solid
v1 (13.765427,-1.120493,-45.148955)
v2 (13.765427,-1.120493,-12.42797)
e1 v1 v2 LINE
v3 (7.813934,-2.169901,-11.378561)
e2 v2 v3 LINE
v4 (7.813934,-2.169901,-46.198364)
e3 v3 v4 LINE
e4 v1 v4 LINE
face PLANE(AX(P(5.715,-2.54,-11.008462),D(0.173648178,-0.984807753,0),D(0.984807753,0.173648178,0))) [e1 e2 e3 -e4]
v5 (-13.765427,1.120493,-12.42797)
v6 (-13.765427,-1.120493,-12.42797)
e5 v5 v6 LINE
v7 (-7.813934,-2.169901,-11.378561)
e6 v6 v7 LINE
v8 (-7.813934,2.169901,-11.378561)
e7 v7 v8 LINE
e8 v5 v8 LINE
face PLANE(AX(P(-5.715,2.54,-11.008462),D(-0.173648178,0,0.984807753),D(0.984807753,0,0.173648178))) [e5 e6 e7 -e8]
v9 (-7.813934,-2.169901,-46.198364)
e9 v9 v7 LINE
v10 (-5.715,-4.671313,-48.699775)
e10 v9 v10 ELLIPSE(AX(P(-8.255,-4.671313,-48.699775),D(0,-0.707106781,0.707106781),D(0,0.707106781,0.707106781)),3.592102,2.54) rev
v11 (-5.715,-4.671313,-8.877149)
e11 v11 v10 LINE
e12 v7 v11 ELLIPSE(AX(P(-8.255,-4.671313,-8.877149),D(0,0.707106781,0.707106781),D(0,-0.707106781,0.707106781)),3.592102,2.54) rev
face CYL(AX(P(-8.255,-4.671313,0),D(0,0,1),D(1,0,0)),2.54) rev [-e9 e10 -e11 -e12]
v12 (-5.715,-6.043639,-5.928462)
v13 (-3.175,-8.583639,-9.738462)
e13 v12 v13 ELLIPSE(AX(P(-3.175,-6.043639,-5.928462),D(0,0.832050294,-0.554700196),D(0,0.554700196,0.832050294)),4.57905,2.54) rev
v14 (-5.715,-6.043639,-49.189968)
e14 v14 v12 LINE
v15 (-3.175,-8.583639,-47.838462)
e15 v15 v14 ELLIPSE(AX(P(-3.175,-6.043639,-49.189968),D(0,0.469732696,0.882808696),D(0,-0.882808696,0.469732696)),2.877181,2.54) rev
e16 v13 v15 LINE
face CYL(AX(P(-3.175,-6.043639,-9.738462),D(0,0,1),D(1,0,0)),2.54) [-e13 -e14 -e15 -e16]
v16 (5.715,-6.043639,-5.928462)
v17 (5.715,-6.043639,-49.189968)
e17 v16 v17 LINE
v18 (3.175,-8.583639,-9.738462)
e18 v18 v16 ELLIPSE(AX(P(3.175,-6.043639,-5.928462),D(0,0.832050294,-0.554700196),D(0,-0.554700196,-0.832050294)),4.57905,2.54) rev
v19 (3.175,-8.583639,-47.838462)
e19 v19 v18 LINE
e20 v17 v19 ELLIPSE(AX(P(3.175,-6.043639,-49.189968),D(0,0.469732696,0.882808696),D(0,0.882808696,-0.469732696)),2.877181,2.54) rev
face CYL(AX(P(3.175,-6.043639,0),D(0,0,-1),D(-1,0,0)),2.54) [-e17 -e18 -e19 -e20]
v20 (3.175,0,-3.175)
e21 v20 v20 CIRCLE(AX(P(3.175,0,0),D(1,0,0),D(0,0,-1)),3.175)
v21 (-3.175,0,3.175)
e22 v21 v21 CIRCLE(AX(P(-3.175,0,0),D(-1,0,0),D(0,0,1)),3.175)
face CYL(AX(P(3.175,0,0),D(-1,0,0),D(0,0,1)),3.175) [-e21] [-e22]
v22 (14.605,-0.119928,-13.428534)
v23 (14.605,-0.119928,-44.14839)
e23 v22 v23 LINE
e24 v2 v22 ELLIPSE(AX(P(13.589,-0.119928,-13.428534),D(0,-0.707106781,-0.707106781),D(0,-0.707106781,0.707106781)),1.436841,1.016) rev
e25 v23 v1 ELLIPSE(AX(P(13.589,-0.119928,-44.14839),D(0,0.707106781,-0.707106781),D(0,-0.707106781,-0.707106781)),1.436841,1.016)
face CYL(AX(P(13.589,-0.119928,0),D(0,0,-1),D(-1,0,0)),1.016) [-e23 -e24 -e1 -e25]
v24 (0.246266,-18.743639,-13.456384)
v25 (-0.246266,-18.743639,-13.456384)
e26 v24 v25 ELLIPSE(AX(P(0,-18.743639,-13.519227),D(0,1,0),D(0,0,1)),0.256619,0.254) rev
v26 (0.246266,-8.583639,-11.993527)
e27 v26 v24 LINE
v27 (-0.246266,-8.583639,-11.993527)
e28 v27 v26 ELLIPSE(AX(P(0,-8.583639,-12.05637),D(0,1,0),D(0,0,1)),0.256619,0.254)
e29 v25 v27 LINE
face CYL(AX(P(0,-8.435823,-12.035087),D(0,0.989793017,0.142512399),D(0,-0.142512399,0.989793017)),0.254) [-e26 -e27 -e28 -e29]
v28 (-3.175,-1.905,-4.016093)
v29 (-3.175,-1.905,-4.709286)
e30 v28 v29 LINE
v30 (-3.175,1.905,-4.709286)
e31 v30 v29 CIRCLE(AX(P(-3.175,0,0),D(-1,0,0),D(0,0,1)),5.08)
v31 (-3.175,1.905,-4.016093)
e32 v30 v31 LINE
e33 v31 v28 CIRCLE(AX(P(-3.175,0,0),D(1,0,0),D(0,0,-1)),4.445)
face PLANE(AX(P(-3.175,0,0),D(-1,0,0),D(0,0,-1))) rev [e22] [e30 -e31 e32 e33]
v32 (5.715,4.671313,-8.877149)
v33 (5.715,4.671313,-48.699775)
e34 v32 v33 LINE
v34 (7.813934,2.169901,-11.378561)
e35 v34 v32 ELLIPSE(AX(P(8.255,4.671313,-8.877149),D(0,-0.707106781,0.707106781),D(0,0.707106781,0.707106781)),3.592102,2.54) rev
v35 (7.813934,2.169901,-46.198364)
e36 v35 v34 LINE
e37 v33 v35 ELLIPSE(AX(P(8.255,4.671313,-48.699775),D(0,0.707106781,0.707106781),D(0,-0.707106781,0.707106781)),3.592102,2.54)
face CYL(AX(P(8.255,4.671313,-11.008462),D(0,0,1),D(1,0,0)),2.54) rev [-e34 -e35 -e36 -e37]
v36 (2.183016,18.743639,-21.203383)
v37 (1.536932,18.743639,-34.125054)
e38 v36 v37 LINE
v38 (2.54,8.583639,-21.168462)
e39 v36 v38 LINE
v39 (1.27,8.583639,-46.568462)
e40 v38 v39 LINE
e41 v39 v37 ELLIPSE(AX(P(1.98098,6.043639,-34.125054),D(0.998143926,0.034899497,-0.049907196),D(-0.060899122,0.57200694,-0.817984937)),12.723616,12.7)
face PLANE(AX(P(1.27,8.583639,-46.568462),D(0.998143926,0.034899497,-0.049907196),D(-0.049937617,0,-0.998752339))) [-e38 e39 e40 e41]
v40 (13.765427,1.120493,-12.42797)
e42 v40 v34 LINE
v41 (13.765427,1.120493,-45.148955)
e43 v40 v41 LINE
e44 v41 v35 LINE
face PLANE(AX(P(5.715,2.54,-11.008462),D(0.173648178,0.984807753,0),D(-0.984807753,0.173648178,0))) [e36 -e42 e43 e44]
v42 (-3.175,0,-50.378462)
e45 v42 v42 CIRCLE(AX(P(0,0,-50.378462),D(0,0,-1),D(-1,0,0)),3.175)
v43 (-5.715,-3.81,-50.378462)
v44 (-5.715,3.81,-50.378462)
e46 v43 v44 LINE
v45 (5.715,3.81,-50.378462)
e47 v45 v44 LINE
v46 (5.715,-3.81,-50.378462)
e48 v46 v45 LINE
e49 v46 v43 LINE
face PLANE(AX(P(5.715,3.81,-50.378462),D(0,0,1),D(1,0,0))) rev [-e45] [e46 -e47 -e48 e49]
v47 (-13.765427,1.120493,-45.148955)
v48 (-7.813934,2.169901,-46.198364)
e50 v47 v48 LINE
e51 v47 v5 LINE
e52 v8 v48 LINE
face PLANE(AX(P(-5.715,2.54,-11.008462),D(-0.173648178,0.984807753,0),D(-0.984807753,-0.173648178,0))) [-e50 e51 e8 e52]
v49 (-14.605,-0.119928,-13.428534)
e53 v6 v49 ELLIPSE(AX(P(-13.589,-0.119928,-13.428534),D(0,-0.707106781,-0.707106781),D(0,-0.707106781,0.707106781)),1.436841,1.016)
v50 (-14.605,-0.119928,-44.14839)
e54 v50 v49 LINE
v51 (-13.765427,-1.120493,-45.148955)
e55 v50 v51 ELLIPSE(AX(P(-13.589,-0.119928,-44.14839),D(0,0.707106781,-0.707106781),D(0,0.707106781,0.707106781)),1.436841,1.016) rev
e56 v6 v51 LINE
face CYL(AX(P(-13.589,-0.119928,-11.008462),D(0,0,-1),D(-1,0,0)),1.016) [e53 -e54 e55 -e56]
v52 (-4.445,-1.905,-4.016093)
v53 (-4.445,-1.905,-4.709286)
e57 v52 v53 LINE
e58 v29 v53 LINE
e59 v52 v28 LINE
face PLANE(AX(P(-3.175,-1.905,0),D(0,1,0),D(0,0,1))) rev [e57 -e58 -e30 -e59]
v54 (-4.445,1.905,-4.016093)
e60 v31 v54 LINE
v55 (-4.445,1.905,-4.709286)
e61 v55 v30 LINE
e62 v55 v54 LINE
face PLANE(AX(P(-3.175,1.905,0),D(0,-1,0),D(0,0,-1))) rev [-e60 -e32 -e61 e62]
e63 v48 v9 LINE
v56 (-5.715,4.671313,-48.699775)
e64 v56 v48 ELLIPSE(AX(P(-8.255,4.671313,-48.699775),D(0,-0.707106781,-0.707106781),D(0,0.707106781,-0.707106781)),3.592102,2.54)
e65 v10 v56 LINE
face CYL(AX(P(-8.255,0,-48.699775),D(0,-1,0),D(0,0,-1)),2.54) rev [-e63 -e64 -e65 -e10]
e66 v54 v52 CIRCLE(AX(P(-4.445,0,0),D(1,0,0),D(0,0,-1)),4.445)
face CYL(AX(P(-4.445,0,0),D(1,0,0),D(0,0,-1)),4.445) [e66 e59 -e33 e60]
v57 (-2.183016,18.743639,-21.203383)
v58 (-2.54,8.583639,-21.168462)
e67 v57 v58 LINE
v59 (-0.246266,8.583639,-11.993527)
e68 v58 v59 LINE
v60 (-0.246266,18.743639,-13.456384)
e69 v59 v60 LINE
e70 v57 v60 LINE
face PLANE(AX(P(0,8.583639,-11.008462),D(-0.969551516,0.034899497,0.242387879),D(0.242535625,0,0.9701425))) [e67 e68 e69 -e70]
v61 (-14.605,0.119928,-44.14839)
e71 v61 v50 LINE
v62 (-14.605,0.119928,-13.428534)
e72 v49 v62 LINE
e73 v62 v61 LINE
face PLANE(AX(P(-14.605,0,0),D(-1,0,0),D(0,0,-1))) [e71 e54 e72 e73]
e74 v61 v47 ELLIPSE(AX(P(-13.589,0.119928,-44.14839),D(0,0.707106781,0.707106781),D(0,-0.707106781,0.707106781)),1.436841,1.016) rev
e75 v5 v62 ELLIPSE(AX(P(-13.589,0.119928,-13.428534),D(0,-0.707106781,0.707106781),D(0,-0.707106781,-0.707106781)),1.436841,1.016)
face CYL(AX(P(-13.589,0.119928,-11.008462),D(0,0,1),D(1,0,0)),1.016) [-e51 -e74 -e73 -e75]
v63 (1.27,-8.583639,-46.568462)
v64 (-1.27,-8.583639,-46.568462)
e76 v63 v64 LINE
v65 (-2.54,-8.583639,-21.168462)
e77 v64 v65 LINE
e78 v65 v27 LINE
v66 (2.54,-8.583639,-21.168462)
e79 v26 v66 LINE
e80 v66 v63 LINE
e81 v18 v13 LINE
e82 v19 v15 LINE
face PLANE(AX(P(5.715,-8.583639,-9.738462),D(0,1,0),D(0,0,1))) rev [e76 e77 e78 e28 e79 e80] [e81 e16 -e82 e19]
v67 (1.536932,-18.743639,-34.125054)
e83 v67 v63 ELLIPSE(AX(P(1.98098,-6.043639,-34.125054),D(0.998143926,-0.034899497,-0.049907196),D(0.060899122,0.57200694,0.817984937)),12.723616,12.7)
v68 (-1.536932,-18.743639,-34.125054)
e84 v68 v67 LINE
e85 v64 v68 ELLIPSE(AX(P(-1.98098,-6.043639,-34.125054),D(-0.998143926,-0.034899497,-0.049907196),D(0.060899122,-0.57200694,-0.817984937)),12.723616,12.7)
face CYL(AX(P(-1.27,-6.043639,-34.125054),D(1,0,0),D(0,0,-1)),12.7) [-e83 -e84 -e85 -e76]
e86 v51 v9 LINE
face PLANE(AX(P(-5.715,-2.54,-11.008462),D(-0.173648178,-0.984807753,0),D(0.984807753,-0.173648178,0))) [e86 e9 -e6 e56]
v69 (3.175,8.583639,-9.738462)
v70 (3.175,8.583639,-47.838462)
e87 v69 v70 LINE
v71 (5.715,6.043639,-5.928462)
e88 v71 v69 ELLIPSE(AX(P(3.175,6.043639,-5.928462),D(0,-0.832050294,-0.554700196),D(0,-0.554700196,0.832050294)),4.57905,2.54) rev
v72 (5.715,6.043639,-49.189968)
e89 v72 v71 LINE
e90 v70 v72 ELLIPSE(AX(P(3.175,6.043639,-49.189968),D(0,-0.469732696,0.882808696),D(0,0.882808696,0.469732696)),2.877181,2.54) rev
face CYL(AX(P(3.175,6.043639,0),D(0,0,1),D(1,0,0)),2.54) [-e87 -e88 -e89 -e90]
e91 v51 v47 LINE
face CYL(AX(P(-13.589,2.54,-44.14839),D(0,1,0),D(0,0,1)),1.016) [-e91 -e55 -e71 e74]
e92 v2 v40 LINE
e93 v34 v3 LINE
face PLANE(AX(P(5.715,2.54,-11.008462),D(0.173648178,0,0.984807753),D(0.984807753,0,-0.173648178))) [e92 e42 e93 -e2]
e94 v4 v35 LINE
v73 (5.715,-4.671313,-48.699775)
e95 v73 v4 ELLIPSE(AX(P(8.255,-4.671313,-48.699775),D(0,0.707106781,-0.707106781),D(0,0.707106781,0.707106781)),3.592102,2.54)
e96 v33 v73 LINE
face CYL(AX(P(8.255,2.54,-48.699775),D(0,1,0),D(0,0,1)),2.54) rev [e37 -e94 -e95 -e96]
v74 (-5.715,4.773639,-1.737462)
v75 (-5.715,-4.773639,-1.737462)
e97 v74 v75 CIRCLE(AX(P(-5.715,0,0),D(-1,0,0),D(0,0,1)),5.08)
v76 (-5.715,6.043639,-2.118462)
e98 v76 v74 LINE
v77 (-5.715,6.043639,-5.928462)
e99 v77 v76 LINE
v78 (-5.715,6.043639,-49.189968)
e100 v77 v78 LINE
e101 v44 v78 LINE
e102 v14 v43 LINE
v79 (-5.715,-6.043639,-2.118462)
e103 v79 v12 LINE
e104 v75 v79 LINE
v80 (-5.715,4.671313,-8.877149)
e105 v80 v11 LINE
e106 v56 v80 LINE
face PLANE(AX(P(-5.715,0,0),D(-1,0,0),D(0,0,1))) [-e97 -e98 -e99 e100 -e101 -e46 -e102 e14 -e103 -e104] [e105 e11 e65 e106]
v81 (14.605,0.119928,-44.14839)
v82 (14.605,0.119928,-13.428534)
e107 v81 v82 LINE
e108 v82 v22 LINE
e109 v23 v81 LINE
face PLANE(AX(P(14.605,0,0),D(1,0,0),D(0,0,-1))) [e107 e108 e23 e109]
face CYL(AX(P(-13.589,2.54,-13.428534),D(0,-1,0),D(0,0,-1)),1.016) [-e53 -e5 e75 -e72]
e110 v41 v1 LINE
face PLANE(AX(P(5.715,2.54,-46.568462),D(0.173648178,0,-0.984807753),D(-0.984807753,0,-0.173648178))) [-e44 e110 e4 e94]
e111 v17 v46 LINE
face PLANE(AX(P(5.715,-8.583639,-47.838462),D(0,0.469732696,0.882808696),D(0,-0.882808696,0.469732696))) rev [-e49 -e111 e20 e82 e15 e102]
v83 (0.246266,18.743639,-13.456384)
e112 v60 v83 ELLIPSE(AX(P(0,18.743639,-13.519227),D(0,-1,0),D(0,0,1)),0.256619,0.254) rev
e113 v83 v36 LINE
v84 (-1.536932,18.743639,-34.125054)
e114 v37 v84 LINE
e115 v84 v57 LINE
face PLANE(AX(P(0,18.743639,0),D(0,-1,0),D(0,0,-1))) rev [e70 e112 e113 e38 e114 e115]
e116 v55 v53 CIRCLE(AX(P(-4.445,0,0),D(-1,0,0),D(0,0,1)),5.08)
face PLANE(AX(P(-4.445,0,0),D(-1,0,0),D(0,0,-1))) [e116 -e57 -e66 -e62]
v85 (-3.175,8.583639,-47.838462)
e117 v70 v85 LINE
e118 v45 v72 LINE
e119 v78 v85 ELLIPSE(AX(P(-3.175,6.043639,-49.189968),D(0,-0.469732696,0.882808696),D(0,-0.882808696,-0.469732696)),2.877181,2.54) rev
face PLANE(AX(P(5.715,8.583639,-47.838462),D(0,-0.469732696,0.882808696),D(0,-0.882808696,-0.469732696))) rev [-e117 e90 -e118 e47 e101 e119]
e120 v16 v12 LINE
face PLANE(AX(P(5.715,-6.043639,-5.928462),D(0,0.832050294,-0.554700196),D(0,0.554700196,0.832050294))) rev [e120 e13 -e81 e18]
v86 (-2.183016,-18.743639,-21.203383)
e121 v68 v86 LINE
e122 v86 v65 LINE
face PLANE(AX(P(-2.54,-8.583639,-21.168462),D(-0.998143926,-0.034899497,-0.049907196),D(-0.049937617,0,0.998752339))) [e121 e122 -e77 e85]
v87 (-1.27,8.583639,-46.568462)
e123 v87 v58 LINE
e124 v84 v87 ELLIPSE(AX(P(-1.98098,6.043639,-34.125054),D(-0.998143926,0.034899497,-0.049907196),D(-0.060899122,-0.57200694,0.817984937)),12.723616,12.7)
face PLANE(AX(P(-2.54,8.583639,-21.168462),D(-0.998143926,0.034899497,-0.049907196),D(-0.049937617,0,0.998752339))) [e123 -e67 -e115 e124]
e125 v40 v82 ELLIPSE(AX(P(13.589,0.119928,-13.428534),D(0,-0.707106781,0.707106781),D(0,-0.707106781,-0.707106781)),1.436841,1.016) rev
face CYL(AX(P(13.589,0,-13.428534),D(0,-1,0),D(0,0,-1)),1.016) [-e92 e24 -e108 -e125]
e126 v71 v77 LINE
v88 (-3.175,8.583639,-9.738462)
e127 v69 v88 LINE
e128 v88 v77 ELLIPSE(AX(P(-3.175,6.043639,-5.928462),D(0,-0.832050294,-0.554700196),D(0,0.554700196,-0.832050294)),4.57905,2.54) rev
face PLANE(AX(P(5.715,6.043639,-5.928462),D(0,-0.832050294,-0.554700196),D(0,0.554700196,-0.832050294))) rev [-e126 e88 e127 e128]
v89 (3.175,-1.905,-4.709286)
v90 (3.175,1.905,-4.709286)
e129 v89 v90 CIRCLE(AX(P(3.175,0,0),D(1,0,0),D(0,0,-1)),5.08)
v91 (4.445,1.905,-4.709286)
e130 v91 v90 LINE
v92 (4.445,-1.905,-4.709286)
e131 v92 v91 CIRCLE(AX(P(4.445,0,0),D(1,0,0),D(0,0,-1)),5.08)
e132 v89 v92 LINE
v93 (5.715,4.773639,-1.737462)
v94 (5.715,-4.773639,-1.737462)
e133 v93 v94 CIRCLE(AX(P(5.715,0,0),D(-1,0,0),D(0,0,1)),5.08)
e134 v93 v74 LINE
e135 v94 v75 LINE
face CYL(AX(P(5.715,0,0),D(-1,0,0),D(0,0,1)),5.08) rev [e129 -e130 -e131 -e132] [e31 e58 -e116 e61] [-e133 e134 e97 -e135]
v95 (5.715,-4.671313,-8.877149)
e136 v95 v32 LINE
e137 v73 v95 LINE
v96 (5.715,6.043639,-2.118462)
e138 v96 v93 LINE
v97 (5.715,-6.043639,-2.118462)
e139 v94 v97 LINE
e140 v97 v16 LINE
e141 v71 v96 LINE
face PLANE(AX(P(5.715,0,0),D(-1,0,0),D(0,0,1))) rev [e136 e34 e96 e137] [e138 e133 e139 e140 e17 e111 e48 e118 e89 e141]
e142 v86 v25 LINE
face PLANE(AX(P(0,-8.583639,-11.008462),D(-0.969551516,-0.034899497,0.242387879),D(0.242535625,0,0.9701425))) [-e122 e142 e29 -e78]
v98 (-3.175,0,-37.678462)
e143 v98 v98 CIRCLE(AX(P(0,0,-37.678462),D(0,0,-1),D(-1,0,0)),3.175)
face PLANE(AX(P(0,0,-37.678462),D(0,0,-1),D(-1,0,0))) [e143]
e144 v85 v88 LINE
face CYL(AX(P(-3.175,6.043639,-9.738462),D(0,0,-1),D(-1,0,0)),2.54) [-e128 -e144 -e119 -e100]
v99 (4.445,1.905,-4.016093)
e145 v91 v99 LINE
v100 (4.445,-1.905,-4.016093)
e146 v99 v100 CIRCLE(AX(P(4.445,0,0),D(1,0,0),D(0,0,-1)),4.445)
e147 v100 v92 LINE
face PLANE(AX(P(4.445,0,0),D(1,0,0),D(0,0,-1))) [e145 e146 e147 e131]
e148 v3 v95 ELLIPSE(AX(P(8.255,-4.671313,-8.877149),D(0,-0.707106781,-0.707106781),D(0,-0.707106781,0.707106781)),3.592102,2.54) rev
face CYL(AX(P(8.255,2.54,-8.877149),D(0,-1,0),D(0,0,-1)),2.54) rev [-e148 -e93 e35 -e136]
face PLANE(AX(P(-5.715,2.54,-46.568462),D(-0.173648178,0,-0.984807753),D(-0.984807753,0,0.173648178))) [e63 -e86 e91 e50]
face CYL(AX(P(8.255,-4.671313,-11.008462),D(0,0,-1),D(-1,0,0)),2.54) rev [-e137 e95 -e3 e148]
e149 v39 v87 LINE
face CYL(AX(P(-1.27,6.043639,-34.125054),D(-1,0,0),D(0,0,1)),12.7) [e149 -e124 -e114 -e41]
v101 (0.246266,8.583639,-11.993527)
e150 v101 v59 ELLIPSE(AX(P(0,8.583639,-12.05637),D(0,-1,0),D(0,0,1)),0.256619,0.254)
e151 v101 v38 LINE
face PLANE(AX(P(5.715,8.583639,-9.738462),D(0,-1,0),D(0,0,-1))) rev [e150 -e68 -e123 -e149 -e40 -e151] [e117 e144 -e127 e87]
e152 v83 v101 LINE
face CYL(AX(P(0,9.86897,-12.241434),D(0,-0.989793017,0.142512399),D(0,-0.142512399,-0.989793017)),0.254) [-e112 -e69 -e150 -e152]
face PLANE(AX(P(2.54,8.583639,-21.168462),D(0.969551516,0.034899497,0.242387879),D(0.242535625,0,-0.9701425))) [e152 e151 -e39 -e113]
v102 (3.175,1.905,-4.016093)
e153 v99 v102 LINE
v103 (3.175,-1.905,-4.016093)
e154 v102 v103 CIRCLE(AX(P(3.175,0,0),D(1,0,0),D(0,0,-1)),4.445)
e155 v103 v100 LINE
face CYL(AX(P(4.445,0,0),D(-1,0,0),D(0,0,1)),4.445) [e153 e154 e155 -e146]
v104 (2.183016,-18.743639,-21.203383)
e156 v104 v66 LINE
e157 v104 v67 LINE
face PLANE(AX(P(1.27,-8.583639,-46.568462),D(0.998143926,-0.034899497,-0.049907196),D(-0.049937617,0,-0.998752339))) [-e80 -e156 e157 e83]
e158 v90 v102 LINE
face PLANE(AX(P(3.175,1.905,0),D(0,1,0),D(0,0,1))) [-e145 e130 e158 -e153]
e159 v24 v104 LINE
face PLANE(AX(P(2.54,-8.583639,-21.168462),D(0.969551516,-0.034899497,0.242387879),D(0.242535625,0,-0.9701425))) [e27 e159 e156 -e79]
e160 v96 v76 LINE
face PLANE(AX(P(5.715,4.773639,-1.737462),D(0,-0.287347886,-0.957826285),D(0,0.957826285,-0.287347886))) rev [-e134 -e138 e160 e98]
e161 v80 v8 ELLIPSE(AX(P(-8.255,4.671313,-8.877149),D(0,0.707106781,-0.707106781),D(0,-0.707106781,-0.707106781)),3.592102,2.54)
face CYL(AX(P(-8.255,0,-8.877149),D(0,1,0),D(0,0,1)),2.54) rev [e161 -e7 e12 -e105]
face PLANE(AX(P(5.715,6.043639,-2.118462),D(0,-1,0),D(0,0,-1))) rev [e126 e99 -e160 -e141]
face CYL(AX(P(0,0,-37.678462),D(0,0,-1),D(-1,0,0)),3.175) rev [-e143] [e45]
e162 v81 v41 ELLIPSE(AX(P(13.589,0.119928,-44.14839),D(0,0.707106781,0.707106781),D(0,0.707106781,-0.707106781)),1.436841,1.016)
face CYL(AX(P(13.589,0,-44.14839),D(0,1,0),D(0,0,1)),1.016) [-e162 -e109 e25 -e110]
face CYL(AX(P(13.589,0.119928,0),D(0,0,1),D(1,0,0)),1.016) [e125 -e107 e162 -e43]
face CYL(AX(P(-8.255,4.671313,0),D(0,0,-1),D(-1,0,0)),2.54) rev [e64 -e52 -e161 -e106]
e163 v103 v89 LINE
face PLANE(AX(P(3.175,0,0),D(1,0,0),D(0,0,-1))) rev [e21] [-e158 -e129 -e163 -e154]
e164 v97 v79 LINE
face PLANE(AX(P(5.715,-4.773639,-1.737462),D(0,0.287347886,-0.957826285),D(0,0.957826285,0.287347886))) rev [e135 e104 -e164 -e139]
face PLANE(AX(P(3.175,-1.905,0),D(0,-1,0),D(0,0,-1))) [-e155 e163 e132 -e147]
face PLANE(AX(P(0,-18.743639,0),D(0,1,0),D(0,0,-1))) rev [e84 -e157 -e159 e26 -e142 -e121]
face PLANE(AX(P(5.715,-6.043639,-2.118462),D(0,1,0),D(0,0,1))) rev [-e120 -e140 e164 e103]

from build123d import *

# Parameters (mm, degrees)
SKETCH1_R                = 3.175
BOSS_EXTRUDE1_DEPTH      = 3.175
SKETCH2_R                = 4.445
BOSS_EXTRUDE2_DEPTH      = 1.27
SKETCH3_W                = 6.35
SKETCH3_H                = 3.81
BOSS_EXTRUDE3_DEPTH      = 1.27
BOSS_EXTRUDE4_DEPTH      = 8.89
BOSS_EXTRUDE4_DEPTH_BACK = 2.54
SKETCH5_R                = 3.175
CUT_EXTRUDE1_DEPTH       = 12.7
FILLET1_R                = 2.54
SKETCH6_W                = 35.56
SKETCH6_H                = 5.08
BOSS_EXTRUDE5_DEPTH      = 8.89
BOSS_EXTRUDE5_TAPER      = 10
FILLET2_R                = 1.016
FILLET3_R                = 2.54
BOSS_EXTRUDE6_DEPTH      = 10.16
BOSS_EXTRUDE6_TAPER      = 2
FILLET4_R                = 0.254
FILLET5_R                = 12.7


with BuildPart() as part:
    # Sketch1 → Boss-Extrude1 (new, symmetric)
    with BuildSketch(Plane(origin=(0, 0, 0), x_dir=(0, 0, -1), z_dir=(1, 0, 0))):
        Circle(SKETCH1_R)
    extrude(amount=BOSS_EXTRUDE1_DEPTH, both=True)

    # Sketch2 → Boss-Extrude2 (add)
    with BuildSketch(Plane(origin=(3.175, 0, 0), x_dir=(0, 0, -1), z_dir=(1, 0, 0))):
        Circle(SKETCH2_R)
    boss_extrude2 = extrude(amount=BOSS_EXTRUDE2_DEPTH)

    # Mirror1: Boss-Extrude2 across plane
    add(boss_extrude2.mirror(Plane(origin=(0, 0, 0), x_dir=(0, 0, 1), z_dir=(1, 0, 0))))

    # Sketch3 → Boss-Extrude3 (add)
    with BuildSketch(Plane(origin=(4.445, 0, 0), x_dir=(0, 0, -1), z_dir=(1, 0, 0))):
        with Locations((3.175, 0)):
            Rectangle(SKETCH3_W, SKETCH3_H)
    boss_extrude3 = extrude(amount=-BOSS_EXTRUDE3_DEPTH)

    # Mirror2: Boss-Extrude3 across plane
    add(boss_extrude3.mirror(Plane(origin=(0, 0, 0), x_dir=(0, 0, 1), z_dir=(1, 0, 0))))

    # Sketch4 → Boss-Extrude4 (add, two sides: drawn at the far end of the back side and taken through both)
    with BuildSketch(Plane(origin=(-3.175, 0, 0), x_dir=(0, 0, -1), z_dir=(1, 0, 0)).offset(-BOSS_EXTRUDE4_DEPTH_BACK)):
        with BuildLine():
            Line((1.737462328, 4.773638514), (2.118462328, 6.043638514))
            Line((2.118462328, 6.043638514), (5.928462328, 6.043638514))
            Line((5.928462328, 6.043638514), (9.738462328, 8.583638514))
            Line((9.738462328, 8.583638514), (47.838462328, 8.583638514))
            Line((47.838462328, 8.583638514), (50.378462328, 3.81))
            Line((50.378462328, 3.81), (50.378462328, -3.81))
            Line((50.378462328, -3.81), (47.838462328, -8.583638514))
            Line((47.838462328, -8.583638514), (9.738462328, -8.583638514))
            Line((9.738462328, -8.583638514), (5.928462328, -6.043638514))
            Line((5.928462328, -6.043638514), (2.118462328, -6.043638514))
            Line((2.118462328, -6.043638514), (1.737462328, -4.773638514))
            ThreePointArc((1.737462328, -4.773638514), (5.08, 0), (1.737462328, 4.773638514))
        make_face()
    extrude(amount=BOSS_EXTRUDE4_DEPTH + BOSS_EXTRUDE4_DEPTH_BACK)

    # Sketch5 → Cut-Extrude1 (cut)
    with BuildSketch(Plane(origin=(0, 0, -50.378462328), x_dir=(-1, 0, 0), z_dir=(0, 0, -1))):
        Circle(SKETCH5_R)
    extrude(amount=-CUT_EXTRUDE1_DEPTH, mode=Mode.SUBTRACT)

    # Fillet1
    fillet1_edges = [part.edges().sort_by_distance(p)[0] for p in [
        (5.715, -8.583638514, -28.788462328),
        (-5.715, -8.583638514, -28.788462328),
        (-5.715, 8.583638514, -28.788462328),
        (5.715, 8.583638514, -28.788462328),
    ]]
    fillet(fillet1_edges, radius=FILLET1_R)

    # Sketch6 → Boss-Extrude5 (add)
    with BuildSketch(Plane(origin=(5.715, 0, 0), x_dir=(0, 0, -1), z_dir=(1, 0, 0))):
        with Locations((28.788462328, 0)):
            Rectangle(SKETCH6_W, SKETCH6_H)
    boss_extrude5 = extrude(amount=BOSS_EXTRUDE5_DEPTH, taper=BOSS_EXTRUDE5_TAPER)

    # Mirror3: Boss-Extrude5 across plane
    add(boss_extrude5.mirror(Plane(origin=(0, 0, 0), x_dir=(0, 0, 1), z_dir=(1, 0, 0))))

    # Fillet2
    fillet2_edges = [part.edges().sort_by_distance(p)[0] for p in [
        (14.605, 0, -12.576009187),
        (14.605, -0.972453142, -28.788462328),
        (14.605, 0, -45.00091547),
        (14.605, 0.972453142, -28.788462328),
        (-14.605, 0, -12.576009187),
        (-14.605, 0.972453142, -28.788462328),
        (-14.605, 0, -45.00091547),
        (-14.605, -0.972453142, -28.788462328),
    ]]
    fillet(fillet2_edges, radius=FILLET2_R)

    # Fillet3
    fillet3_edges = [part.edges().sort_by_distance(p)[0] for p in [
        (5.715, 0, -11.008462328),
        (5.715, -2.54, -28.788462328),
        (5.715, 0, -46.568462328),
        (5.715, 2.54, -28.788462328),
        (-5.715, 0, -11.008462328),
        (-5.715, -2.54, -28.788462328),
        (-5.715, 0, -46.568462328),
        (-5.715, 2.54, -28.788462328),
    ]]
    fillet(fillet3_edges, radius=FILLET3_R)

    # Sketch7 → Boss-Extrude6 (add)
    with BuildSketch(Plane(origin=(0, 8.583638514, 0), x_dir=(1, 0, 0), z_dir=(0, 1, 0))):
        Polygon((-1.27, 46.568462328), (-2.54, 21.168462328), (0, 11.008462328), (2.54, 21.168462328), (1.27, 46.568462328), align=None)
    boss_extrude6 = extrude(amount=BOSS_EXTRUDE6_DEPTH, taper=BOSS_EXTRUDE6_TAPER)

    # Mirror4: Boss-Extrude6 across plane
    add(boss_extrude6.mirror(Plane.ZX))

    # Fillet4
    fillet4_edges = [part.edges().sort_by_distance(p)[0] for p in [
        (0, 13.663638514, -11.739890995),
        (0, -13.663638514, -11.739890995),
    ]]
    fillet(fillet4_edges, radius=FILLET4_R)

    # Fillet5
    # the kernel refuses this fillet: 12.7 mm, written as the material it takes off along each edge
    with BuildSketch(Plane(origin=(31.154033704, -18.743638514, -46.21366731), x_dir=(0, 0.9993908270191081, -0.034899496702148744), z_dir=(-1, 0, 0))) as fillet5_piece_1:
        with BuildLine():
            CenterArc((12.270376998, -12.524472427), FILLET5_R, 99.536959033, 78.463040967)
            Line((-0.421886505, -12.081248819), (-0.675731775, -12.072384347))
            Line((-0.675731775, -12.072384347), (-0.25384527, 0.008864472))
            Line((-0.25384527, 0.008864472), (0, 0.254))
            ThreePointArc((0, 0.254), (5.083096485, 0.254), (10.12410929, 0.250489449))
            Line((10.12410929, 0.250489449), (10.16619297, 0))
        make_face()
    extrude(amount=62.308067408, mode=Mode.SUBTRACT)
    with BuildSketch(Plane(origin=(31.154033704, 18.743638514, -46.21366731), x_dir=(0, -0.9993908270191081, -0.034899496702148744), z_dir=(-1, 0, 0))) as fillet5_piece_2:
        with BuildLine():
            CenterArc((12.270376998, 12.524472427), FILLET5_R, 182, 78.463040967)
            Line((-0.421886505, 12.081248819), (-0.675731775, 12.072384347))
            Line((-0.675731775, 12.072384347), (-0.25384527, -0.008864472))
            Line((-0.25384527, -0.008864472), (0, -0.254))
            ThreePointArc((0, -0.254), (5.083096485, -0.254), (10.12410929, -0.250489449))
            Line((10.12410929, -0.250489449), (10.16619297, 0))
        make_face()
    extrude(amount=62.308067408, mode=Mode.SUBTRACT)


solid = part.part
